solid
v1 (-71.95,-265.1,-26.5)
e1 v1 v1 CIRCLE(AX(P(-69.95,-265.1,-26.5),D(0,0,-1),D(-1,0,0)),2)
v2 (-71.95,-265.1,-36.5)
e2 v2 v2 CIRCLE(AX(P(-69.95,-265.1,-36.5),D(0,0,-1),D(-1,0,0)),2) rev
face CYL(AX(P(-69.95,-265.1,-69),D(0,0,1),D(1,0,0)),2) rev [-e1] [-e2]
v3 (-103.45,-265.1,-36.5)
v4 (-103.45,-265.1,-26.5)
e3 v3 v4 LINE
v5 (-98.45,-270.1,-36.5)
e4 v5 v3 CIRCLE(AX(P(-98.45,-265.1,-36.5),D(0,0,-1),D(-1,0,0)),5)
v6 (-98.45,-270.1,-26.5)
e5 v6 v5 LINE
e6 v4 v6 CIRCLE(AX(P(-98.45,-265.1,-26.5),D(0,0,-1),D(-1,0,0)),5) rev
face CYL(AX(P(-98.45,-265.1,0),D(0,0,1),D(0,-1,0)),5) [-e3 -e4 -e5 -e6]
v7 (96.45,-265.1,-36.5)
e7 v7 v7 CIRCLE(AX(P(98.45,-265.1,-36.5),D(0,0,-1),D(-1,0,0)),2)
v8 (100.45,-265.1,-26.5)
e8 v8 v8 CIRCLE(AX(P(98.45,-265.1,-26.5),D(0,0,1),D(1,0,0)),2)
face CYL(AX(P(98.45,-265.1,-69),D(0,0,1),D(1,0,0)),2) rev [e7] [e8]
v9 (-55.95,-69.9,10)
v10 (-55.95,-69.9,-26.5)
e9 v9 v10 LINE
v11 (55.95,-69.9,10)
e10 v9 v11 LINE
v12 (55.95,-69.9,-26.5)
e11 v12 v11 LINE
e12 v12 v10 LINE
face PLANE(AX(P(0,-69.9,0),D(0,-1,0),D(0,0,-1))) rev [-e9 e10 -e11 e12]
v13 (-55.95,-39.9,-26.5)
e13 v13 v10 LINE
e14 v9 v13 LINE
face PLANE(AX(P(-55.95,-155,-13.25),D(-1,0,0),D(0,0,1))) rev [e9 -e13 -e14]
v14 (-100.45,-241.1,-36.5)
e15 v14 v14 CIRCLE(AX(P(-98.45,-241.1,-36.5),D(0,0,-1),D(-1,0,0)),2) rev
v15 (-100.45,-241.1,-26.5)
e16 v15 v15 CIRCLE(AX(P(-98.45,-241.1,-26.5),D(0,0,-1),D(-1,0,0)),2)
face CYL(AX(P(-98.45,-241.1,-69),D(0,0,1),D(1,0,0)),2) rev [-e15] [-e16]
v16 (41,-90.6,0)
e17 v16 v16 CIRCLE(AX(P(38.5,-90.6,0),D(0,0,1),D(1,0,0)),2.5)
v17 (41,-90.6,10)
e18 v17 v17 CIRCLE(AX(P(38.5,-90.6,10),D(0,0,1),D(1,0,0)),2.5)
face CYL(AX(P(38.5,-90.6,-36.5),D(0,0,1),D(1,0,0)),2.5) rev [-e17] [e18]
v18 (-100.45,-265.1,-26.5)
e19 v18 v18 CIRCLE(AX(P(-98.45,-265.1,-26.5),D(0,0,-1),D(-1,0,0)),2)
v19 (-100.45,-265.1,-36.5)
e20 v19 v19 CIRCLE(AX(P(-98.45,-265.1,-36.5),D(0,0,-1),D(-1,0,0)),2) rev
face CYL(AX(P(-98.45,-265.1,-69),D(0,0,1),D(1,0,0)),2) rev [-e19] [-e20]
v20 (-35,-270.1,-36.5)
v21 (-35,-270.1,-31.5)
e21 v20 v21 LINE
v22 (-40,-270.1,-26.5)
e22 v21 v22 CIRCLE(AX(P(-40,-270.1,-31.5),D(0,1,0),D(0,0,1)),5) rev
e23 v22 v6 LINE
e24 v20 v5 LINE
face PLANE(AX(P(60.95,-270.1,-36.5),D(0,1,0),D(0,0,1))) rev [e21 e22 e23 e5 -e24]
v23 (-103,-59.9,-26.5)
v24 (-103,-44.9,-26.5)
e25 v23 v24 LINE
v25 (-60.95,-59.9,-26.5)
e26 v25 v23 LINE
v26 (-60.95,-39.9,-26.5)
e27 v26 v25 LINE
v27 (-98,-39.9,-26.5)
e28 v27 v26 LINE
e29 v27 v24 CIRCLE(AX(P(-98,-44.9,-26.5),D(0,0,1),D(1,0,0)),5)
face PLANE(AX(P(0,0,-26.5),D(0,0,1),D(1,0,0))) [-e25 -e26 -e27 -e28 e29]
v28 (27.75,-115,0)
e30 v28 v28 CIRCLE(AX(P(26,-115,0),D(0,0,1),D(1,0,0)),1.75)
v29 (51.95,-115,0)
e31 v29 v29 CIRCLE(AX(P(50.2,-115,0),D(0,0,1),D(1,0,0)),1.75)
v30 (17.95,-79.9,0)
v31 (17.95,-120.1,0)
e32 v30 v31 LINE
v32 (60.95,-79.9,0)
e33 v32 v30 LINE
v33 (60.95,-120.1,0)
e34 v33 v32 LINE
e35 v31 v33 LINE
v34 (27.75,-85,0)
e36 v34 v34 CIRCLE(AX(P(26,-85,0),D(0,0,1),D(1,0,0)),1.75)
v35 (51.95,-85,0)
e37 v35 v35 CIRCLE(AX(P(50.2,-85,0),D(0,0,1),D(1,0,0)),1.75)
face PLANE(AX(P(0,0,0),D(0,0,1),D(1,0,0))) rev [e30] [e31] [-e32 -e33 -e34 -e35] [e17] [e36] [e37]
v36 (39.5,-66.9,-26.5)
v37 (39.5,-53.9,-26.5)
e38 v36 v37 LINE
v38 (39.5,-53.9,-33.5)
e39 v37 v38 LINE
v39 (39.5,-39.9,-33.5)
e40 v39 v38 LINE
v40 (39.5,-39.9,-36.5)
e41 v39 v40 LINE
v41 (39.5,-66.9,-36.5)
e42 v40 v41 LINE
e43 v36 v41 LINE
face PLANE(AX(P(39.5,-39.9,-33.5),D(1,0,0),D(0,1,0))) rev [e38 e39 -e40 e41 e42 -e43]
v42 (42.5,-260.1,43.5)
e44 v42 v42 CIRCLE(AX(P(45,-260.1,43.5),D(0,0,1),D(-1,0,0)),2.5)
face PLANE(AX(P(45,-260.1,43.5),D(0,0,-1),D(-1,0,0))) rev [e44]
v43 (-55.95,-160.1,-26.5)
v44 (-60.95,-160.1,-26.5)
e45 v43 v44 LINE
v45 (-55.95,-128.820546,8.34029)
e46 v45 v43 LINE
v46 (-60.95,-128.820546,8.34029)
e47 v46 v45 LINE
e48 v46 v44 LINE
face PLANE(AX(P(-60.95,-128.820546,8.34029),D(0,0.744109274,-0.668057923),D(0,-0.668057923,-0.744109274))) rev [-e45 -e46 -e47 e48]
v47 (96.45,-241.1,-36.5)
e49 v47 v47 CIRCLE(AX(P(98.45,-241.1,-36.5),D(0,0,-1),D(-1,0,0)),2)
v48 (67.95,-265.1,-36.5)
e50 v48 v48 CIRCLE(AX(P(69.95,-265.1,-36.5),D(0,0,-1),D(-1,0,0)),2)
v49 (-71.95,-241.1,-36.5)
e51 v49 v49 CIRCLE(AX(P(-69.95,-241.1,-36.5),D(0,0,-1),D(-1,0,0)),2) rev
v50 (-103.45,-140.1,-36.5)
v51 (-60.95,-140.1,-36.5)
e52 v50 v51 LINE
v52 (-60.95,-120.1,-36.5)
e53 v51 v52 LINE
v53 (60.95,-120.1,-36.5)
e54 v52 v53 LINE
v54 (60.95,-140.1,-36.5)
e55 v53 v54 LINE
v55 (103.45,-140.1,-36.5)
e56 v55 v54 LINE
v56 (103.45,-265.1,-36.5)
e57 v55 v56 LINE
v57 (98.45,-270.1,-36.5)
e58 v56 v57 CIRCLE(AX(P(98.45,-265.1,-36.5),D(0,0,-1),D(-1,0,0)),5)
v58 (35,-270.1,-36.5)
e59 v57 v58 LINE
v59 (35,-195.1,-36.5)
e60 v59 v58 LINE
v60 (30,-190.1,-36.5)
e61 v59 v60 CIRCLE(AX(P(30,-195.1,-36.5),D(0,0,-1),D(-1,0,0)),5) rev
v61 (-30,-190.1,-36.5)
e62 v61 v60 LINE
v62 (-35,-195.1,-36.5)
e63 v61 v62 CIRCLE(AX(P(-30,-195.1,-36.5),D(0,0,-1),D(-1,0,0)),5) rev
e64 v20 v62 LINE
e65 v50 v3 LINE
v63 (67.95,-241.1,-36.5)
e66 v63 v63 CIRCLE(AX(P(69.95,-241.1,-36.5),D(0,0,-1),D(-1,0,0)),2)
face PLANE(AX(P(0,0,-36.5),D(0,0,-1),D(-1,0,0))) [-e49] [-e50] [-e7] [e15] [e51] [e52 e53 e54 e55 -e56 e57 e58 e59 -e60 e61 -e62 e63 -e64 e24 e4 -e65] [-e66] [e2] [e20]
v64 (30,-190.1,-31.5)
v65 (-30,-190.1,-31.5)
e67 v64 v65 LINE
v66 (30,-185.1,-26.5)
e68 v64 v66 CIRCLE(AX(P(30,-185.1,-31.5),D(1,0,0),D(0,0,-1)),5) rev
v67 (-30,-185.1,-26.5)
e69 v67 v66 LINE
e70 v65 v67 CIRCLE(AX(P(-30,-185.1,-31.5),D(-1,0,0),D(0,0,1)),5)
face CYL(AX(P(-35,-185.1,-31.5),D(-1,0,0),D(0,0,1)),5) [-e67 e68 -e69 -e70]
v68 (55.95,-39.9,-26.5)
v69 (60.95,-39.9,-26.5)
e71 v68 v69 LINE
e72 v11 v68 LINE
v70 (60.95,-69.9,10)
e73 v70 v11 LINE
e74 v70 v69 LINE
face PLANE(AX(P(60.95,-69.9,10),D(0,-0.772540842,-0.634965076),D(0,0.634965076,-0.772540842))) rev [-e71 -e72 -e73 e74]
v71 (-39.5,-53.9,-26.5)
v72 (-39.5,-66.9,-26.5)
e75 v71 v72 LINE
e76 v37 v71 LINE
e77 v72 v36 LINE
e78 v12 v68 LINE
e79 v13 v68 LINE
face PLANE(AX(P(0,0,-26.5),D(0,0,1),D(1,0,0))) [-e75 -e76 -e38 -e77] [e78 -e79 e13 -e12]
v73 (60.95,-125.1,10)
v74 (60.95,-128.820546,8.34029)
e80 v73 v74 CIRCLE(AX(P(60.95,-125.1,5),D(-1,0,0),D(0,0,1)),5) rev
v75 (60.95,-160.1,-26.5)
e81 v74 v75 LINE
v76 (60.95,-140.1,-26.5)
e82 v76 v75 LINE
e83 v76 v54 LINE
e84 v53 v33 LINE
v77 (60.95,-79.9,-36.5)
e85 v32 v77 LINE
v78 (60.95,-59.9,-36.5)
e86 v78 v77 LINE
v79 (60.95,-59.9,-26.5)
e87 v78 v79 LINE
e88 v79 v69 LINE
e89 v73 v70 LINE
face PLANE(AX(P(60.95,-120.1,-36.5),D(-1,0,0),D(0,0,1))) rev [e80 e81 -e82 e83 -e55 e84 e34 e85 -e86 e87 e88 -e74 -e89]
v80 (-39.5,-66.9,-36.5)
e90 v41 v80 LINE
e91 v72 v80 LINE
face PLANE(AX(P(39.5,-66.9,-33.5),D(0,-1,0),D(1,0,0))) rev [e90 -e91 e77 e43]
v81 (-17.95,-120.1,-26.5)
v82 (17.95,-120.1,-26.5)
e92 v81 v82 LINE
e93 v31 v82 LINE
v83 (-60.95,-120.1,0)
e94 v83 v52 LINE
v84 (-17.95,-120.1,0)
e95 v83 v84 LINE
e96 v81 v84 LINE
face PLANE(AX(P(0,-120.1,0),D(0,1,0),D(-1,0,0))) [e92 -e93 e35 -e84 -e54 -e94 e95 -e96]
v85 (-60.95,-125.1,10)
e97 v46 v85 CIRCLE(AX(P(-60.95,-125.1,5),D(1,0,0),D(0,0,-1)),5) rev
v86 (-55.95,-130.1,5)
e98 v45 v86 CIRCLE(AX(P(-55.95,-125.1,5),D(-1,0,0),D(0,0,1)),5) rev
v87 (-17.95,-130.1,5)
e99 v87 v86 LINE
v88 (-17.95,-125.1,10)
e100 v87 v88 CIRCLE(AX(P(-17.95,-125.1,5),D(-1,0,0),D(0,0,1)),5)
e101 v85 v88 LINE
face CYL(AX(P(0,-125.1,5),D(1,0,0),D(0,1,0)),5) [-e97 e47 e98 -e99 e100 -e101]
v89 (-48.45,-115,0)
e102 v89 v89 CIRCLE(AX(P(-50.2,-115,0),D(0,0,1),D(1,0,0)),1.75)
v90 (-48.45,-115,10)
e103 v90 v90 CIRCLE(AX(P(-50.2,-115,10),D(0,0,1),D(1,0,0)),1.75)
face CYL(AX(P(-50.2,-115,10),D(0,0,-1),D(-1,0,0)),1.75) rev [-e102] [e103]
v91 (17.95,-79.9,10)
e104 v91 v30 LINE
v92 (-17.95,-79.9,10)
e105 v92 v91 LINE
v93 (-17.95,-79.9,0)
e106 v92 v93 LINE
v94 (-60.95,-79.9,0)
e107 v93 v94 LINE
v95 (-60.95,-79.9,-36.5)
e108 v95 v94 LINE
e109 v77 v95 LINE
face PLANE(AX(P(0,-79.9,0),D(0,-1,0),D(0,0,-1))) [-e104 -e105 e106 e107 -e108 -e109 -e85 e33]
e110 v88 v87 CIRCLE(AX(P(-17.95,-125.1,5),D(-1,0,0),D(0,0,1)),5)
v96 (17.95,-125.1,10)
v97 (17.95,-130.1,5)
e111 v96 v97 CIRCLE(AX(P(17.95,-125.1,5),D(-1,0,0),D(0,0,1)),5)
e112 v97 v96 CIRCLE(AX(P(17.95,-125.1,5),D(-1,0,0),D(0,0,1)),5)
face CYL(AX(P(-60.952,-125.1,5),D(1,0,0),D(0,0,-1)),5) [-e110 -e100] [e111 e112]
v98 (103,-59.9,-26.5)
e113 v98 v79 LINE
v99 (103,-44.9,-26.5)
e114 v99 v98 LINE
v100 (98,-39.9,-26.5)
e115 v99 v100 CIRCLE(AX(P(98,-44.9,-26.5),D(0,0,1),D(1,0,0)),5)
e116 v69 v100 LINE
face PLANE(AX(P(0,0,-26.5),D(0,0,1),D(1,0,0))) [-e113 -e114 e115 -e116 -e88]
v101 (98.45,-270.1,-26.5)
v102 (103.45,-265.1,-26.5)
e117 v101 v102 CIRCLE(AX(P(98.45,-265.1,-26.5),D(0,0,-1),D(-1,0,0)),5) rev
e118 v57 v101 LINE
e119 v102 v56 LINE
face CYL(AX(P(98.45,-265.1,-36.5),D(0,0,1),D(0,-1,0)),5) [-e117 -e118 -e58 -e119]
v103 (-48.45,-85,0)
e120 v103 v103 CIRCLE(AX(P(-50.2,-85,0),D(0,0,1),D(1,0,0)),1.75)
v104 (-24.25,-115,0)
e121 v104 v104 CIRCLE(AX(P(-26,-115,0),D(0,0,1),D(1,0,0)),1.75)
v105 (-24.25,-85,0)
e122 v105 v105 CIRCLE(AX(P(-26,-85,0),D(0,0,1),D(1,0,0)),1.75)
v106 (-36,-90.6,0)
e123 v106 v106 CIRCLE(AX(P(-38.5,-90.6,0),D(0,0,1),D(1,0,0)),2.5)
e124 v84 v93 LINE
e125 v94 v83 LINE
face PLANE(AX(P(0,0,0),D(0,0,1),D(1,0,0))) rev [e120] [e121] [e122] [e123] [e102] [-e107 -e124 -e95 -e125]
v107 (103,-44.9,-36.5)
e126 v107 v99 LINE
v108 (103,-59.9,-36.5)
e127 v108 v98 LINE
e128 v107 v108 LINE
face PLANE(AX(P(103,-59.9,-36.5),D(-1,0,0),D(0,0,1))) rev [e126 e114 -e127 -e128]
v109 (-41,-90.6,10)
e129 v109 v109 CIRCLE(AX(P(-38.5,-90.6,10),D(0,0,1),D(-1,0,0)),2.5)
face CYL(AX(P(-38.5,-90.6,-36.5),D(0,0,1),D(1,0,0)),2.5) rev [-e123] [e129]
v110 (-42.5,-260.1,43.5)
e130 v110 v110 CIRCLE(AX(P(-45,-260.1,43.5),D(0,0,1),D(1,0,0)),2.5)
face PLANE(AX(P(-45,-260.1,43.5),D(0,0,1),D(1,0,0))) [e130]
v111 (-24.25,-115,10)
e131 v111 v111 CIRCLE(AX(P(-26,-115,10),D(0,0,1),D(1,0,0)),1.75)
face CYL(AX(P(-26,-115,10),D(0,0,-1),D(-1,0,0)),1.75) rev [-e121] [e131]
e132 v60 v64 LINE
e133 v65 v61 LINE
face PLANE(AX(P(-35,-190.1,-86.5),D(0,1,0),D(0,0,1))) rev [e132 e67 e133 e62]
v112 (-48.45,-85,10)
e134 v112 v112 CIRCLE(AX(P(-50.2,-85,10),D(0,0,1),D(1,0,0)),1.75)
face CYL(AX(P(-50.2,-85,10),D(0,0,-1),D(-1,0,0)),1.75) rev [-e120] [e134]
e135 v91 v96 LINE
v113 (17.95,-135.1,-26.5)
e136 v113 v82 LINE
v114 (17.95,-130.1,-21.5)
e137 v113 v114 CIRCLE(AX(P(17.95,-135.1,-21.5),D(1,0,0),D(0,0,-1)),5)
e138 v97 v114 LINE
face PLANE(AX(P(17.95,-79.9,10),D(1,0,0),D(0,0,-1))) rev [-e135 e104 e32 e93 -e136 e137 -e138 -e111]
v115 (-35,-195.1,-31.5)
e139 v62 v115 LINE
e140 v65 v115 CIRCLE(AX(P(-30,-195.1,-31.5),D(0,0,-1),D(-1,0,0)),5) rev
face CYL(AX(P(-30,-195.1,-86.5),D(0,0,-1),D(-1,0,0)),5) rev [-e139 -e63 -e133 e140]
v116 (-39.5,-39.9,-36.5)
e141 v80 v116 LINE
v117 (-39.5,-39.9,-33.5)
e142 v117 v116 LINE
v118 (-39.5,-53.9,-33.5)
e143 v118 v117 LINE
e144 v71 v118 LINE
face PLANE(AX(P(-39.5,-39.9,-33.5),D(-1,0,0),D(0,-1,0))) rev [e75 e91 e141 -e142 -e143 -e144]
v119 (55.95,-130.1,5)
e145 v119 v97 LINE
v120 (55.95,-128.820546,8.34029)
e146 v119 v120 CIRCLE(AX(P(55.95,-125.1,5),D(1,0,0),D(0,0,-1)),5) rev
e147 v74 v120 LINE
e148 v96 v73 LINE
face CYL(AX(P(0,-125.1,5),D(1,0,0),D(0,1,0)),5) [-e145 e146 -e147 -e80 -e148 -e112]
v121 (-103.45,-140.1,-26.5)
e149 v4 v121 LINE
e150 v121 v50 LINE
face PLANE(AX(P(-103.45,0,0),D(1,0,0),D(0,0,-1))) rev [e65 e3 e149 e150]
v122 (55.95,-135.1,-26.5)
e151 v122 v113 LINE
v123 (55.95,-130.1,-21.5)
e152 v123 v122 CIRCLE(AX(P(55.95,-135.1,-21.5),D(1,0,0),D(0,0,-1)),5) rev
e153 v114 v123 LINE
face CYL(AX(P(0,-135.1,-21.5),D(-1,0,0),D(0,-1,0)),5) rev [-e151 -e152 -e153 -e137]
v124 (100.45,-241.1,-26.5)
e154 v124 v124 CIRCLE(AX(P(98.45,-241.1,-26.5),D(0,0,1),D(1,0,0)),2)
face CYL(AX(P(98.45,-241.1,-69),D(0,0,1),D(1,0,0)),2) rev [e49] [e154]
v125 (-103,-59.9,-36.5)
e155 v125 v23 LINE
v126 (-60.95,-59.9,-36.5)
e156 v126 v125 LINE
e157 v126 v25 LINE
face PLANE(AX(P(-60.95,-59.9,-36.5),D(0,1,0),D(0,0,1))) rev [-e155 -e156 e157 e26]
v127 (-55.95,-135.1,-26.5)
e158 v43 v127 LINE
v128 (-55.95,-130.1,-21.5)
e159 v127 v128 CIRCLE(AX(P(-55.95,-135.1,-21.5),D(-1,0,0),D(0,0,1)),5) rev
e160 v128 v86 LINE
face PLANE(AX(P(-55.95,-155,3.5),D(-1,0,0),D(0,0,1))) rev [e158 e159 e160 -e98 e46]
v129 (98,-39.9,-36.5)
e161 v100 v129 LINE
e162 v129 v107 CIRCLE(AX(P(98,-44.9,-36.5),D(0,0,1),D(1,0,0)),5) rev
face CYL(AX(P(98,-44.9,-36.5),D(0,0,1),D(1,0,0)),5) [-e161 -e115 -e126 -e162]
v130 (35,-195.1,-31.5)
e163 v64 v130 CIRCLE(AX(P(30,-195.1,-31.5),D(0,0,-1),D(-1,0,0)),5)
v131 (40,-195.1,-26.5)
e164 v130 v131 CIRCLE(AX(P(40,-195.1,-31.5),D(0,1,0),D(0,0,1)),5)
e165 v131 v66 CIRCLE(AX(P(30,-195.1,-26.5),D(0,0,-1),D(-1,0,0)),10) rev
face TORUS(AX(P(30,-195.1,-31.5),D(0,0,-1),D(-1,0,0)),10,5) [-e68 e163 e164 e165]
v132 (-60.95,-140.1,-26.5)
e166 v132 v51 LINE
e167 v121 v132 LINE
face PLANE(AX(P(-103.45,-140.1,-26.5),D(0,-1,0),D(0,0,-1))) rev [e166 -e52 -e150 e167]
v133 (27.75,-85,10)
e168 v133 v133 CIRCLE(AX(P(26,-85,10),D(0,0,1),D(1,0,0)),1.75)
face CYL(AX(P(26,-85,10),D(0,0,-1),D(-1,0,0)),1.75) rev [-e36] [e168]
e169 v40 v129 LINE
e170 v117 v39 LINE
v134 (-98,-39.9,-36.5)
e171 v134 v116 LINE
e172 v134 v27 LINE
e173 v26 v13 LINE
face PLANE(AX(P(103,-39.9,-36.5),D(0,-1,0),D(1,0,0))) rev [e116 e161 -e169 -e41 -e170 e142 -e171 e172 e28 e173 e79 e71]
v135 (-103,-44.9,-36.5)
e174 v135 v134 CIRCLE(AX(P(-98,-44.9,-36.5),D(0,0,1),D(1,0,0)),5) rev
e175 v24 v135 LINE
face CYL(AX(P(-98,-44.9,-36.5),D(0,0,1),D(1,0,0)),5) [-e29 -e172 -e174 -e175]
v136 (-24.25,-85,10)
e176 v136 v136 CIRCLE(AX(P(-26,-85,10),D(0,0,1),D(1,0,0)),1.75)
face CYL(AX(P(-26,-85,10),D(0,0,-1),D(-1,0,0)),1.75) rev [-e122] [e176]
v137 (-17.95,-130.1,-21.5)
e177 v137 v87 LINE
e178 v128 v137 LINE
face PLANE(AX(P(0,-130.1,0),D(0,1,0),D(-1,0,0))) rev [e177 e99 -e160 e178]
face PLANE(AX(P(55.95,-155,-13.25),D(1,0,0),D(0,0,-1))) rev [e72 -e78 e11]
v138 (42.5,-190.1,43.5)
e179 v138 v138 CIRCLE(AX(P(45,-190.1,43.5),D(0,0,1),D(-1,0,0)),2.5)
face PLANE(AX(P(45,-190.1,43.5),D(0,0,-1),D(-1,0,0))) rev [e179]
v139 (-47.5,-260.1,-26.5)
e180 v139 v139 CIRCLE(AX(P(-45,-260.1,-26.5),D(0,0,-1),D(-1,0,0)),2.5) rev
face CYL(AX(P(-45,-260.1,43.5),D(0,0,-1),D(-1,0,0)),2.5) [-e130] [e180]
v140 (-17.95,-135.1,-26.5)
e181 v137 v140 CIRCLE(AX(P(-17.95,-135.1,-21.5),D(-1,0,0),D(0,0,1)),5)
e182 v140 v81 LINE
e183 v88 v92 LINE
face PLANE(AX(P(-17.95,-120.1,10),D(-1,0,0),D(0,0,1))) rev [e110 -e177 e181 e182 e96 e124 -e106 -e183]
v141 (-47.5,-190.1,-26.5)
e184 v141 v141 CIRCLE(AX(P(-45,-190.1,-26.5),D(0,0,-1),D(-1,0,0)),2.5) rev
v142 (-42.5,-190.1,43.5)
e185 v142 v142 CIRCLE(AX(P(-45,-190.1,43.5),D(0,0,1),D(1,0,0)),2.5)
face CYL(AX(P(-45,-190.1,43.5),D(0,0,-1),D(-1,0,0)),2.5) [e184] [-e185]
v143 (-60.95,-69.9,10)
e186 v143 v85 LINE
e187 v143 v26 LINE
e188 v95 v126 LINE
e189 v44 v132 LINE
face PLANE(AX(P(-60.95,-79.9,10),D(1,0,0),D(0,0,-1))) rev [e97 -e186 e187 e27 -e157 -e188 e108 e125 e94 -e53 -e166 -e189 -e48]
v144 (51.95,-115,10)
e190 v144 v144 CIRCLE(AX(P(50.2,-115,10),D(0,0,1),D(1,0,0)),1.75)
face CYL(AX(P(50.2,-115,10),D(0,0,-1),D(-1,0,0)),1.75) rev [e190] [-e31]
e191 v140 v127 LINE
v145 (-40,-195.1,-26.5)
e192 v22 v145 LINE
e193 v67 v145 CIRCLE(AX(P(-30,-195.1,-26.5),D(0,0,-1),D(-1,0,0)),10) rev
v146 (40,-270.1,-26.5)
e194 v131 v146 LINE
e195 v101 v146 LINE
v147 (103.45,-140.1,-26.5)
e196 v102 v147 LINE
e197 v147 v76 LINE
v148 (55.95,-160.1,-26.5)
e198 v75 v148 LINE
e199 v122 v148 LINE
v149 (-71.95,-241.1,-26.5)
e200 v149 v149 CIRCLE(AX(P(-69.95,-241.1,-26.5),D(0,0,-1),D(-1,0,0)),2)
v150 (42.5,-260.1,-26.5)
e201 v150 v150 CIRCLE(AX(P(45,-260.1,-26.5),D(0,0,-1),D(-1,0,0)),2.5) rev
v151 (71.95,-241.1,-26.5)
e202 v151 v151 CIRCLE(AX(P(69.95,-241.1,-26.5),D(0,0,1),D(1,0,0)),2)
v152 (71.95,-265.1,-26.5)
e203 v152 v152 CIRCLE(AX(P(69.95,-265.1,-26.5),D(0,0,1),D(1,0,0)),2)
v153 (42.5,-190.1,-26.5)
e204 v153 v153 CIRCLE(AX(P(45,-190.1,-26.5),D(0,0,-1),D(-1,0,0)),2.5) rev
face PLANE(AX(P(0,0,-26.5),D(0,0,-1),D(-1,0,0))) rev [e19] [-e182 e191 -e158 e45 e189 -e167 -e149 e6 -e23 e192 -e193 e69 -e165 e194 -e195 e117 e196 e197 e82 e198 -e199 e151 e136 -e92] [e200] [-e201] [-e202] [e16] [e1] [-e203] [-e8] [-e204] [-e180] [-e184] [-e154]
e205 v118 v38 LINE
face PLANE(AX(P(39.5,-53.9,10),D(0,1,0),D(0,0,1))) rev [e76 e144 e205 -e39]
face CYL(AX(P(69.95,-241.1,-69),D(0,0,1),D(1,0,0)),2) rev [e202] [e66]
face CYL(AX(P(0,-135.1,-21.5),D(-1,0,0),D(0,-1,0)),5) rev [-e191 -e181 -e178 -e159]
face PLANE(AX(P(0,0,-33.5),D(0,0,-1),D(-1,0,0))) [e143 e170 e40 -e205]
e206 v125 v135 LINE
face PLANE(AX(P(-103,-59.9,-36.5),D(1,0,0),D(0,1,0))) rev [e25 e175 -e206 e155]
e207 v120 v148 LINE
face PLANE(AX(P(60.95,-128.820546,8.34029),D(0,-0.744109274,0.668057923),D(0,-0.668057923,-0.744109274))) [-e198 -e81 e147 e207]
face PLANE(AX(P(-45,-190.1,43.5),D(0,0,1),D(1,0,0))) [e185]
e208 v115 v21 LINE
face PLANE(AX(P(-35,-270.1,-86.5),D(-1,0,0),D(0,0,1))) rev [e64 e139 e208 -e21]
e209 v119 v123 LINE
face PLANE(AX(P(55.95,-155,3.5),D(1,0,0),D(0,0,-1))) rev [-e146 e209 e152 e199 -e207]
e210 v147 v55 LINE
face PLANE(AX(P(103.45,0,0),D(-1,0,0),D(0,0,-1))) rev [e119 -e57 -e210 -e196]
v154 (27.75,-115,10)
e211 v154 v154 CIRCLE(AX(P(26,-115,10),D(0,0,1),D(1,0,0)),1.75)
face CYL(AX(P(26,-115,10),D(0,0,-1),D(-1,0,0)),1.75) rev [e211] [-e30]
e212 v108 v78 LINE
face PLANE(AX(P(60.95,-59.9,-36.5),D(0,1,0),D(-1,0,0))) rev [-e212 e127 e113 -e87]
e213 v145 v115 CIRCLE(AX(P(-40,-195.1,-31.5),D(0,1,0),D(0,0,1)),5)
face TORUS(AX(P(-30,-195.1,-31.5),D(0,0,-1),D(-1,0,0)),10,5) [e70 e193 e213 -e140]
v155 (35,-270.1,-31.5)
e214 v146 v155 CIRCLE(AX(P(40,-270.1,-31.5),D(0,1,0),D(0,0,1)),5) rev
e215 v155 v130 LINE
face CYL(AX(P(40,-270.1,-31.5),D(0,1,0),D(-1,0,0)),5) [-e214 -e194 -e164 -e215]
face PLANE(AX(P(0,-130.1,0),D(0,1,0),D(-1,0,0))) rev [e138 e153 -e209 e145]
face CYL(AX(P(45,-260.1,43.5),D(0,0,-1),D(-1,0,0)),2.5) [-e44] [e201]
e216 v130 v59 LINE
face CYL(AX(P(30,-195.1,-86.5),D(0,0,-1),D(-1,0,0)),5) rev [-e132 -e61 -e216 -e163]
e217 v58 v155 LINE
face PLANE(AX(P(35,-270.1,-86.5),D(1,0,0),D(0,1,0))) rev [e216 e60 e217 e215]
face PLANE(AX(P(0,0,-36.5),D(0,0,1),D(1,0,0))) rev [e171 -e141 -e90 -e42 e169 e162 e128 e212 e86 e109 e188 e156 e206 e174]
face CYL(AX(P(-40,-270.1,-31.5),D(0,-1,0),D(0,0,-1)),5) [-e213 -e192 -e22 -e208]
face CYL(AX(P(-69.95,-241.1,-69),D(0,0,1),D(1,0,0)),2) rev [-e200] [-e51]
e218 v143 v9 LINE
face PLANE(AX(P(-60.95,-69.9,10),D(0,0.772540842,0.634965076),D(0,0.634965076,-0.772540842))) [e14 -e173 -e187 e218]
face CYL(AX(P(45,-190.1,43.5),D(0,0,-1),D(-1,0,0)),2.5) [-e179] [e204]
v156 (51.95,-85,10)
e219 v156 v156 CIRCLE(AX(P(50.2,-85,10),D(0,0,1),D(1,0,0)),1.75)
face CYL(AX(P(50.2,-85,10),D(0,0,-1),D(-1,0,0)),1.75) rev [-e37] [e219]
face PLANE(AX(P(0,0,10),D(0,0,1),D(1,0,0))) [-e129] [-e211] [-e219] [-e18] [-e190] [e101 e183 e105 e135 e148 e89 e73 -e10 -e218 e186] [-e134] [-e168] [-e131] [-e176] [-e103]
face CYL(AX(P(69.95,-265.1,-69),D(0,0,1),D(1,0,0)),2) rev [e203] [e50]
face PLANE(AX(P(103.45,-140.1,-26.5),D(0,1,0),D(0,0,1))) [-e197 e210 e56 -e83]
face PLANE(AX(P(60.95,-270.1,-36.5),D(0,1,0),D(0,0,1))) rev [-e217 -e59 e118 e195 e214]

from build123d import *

# Parameters (mm, degrees)
SKETCH_2_W          = 43
SKETCH_2_H          = 40.2
SKETCH_2_R          = 1.75
EXTRUDE_1_DEPTH     = 10
EXTRUDE_1_2_DEPTH   = 10
SKETCH_3_W          = 43
SKETCH_3_H          = 36.5
EXTRUDE_2_DEPTH     = 10
SKETCH_4_W          = 121.9
SKETCH_4_H          = 150
EXTRUDE_3_DEPTH     = 10
SKETCH_6_W          = 121.9
SKETCH_6_H          = 36.5
EXTRUDE_4_DEPTH     = 10
EXTRUDE_5_REACH     = 285.745
SKETCH_7_R          = 5
FILLET_1_R          = 5
FILLET_2_R          = 5
EXTRUDE_6_DEPTH     = 10
SKETCH_9_W          = 79
SKETCH_9_H          = 27
CUT_EXTRUDE_1_DEPTH = 3
SKETCH_10_W         = 79
SKETCH_10_H         = 13
CUT_EXTRUDE_2_DEPTH = 293.327316548
RIB_16_REACH        = 320.066
SKETCH_11_WALL_W    = 685.378322466
SKETCH_11_WALL_H    = 5
SKETCH_12_W         = 10
SKETCH_12_H         = 130
EXTRUDE_7_DEPTH     = 42.5
SKETCH_13_R         = 2
CUT_EXTRUDE_3_DEPTH = 42.5
SKETCH_14_R         = 2.5
EXTRUDE_8_DEPTH     = 70
SKETCH_15_W         = 70
SKETCH_15_H         = 80
CUT_EXTRUDE_4_DEPTH = 60
RIB_17_REACH        = 321.176
SKETCH_16_WALL_W    = 687.174412562
SKETCH_16_WALL_H    = 5
FILLET_4_R          = 5
FILLET_5_R          = 5
FILLET_6_R          = 5
SKETCH_17_R         = 2.5
CUT_EXTRUDE_5_DEPTH = 293.947371553


with BuildPart() as part:
    # 草图2 → 凸台-拉伸1 (new body)
    with BuildSketch(Plane.XY):
        with Locations((-39.45, -100)):
            Rectangle(SKETCH_2_W, SKETCH_2_H)
        with Locations((-50.2, -85)):
            Circle(SKETCH_2_R, mode=Mode.SUBTRACT)
        with Locations((-26, -85)):
            Circle(SKETCH_2_R, mode=Mode.SUBTRACT)
        with Locations((-50.2, -115)):
            Circle(SKETCH_2_R, mode=Mode.SUBTRACT)
        with Locations((-26, -115)):
            Circle(SKETCH_2_R, mode=Mode.SUBTRACT)
    extrude(amount=EXTRUDE_1_DEPTH)



with BuildPart() as body_2:
    # 草图2 → Extrude 1 2 (new body)
    with BuildSketch(Plane.XY):
        with Locations((39.45, -100)):
            Rectangle(SKETCH_2_W, SKETCH_2_H)
        with Locations((50.2, -85)):
            Circle(SKETCH_2_R, mode=Mode.SUBTRACT)
        with Locations((26, -85)):
            Circle(SKETCH_2_R, mode=Mode.SUBTRACT)
        with Locations((26, -115)):
            Circle(SKETCH_2_R, mode=Mode.SUBTRACT)
        with Locations((50.2, -115)):
            Circle(SKETCH_2_R, mode=Mode.SUBTRACT)
    extrude(amount=EXTRUDE_1_2_DEPTH)


with BuildPart() as part_1:
    add(part.part)

    add(body_2.part)  # 凸台-拉伸2 merges body 2
    # 草图3 → 凸台-拉伸2 (add)
    with BuildSketch(Plane.XZ.offset(120.1)):
        with Locations((39.45, -8.25)):
            Rectangle(SKETCH_3_W, SKETCH_3_H)
        with Locations((-39.45, -8.25)):
            Rectangle(SKETCH_3_W, SKETCH_3_H)
    extrude(amount=EXTRUDE_2_DEPTH)

    # 草图4 → 凸台-拉伸3 (add)
    with BuildSketch(Plane(origin=(0, 0, -26.5), x_dir=(-1, 0, 0), z_dir=(0, 0, -1))):
        with Locations((0, -195.1)):
            Rectangle(SKETCH_4_W, SKETCH_4_H)
    extrude(amount=EXTRUDE_3_DEPTH)

    # 草图6 → 凸台-拉伸4 (add)
    with BuildSketch(Plane(origin=(0, -79.9, 0), x_dir=(1, 0, 0), z_dir=(0, 1, 0))):
        with Locations((0, 8.25)):
            Rectangle(SKETCH_6_W, SKETCH_6_H)
    extrude(amount=EXTRUDE_4_DEPTH)

    # 草图7 → 凸台-拉伸5 (add, up to next)
    with BuildSketch(Plane.ZY.offset(-17.95), mode=Mode.PRIVATE) as extrude_5_sk1:
        with Locations((5, -125.1)):
            Circle(SKETCH_7_R)
    extrude_5_tool1 = extrude(extrude_5_sk1.sketch, amount=EXTRUDE_5_REACH, mode=Mode.PRIVATE) - part_1.part
    add(extrude_5_tool1.solids().sort_by_distance((17.95, -125.1, 5))[0])

    # 圆角1
    fillet_1_edges = [part_1.edges().sort_by_distance(p)[0] for p in [
        (-39.45, -130.1, 10),
        (39.45, -130.1, 10),
    ]]
    fillet(fillet_1_edges, radius=FILLET_1_R)

    # 圆角2
    fillet_2_edges = [part_1.edges().sort_by_distance(p)[0] for p in [
        (-39.45, -130.1, -26.5),
        (39.45, -130.1, -26.5),
    ]]
    fillet(fillet_2_edges, radius=FILLET_2_R)

    # 草图8 → 凸台-拉伸6 (add)
    with BuildSketch(Plane(origin=(0, 0, -26.5), x_dir=(-1, 0, 0), z_dir=(0, 0, -1))):
        Polygon((-60.95, -79.9), (60.95, -79.9), (60.95, -59.9), (103, -59.9), (103, -39.9), (-103, -39.9), (-103, -59.9), (-60.95, -59.9), align=None)
    extrude(amount=EXTRUDE_6_DEPTH)

    # 草图9 → 切除-拉伸1 (cut)
    with BuildSketch(Plane(origin=(0, 0, -36.5), x_dir=(-1, 0, 0), z_dir=(0, 0, -1))):
        with Locations((0, -53.4)):
            Rectangle(SKETCH_9_W, SKETCH_9_H)
    extrude(amount=-CUT_EXTRUDE_1_DEPTH, mode=Mode.SUBTRACT)

    # 草图10 → 切除-拉伸2 (cut, through all)
    with BuildSketch(Plane(origin=(0, 0, -33.5), x_dir=(-1, 0, 0), z_dir=(0, 0, -1))):
        with Locations((0, -60.4)):
            Rectangle(SKETCH_10_W, SKETCH_10_H)
    extrude(amount=-CUT_EXTRUDE_2_DEPTH, mode=Mode.SUBTRACT)

    # 草图11 wall → 筋16 (add, up to next)
    with BuildSketch(Plane(origin=(-60.95, -54.9, -8.25), x_dir=(0, 0.634965075677, -0.772540842073), z_dir=(0, -0.772540842073, -0.634965075677)), mode=Mode.PRIVATE) as rib_16_sk1:
        with Locations((0, 2.5)):
            Rectangle(SKETCH_11_WALL_W, SKETCH_11_WALL_H)
    rib_16_tool1 = extrude(rib_16_sk1.sketch, amount=RIB_16_REACH, mode=Mode.PRIVATE) - part_1.part
    rib_16 = rib_16_tool1.solids().sort_by_distance((-60.95, -54.9, -8.25))[0]
    add(rib_16)

    # 镜向1: 筋16 across plane
    add(rib_16.mirror(Plane(origin=(0, 0, 0), x_dir=(0, 0, 1), z_dir=(1, 0, 0))))

    # 草图12 → 凸台-拉伸7 (add)
    with BuildSketch(Plane.ZY.offset(60.95)):
        with Locations((-31.5, -205.1)):
            Rectangle(SKETCH_12_W, SKETCH_12_H)
    extrude_7 = extrude(amount=EXTRUDE_7_DEPTH)

    # 镜向2: 凸台-拉伸7 across plane
    add(extrude_7.mirror(Plane(origin=(0, 0, 0), x_dir=(0, 0, 1), z_dir=(1, 0, 0))))

    # 草图13 → 切除-拉伸3 (cut)
    with BuildSketch(Plane.XY.offset(-26.5)):
        with Locations((98.45, -265.1)):
            Circle(SKETCH_13_R)
        with Locations((98.45, -241.1)):
            Circle(SKETCH_13_R)
        with Locations((69.95, -265.1)):
            Circle(SKETCH_13_R)
        with Locations((69.95, -241.1)):
            Circle(SKETCH_13_R)
    cut_extrude_3 = extrude(amount=-CUT_EXTRUDE_3_DEPTH, mode=Mode.SUBTRACT)

    # 镜向3: 切除-拉伸3 across plane
    add(cut_extrude_3.mirror(Plane(origin=(0, 0, 0), x_dir=(0, 0, 1), z_dir=(1, 0, 0))), mode=Mode.SUBTRACT)

    # 草图14 → 凸台-拉伸8 (add)
    with BuildSketch(Plane.XY.offset(-26.5)):
        with Locations((-45, -260.1)):
            Circle(SKETCH_14_R)
        with Locations((45, -260.1)):
            Circle(SKETCH_14_R)
        with Locations((-45, -190.1)):
            Circle(SKETCH_14_R)
        with Locations((45, -190.1)):
            Circle(SKETCH_14_R)
    extrude(amount=EXTRUDE_8_DEPTH)

    # 草图15 → 切除-拉伸4 (cut)
    with BuildSketch(Plane.XY.offset(-26.5)):
        with Locations((0, -230.1)):
            Rectangle(SKETCH_15_W, SKETCH_15_H)
    extrude(amount=-CUT_EXTRUDE_4_DEPTH, mode=Mode.SUBTRACT)

    # 草图16 wall → 筋17 (add, up to next)
    with BuildSketch(Plane(origin=(-60.95, -144.460273185, -9.079855192), x_dir=(0, -0.668057923191, -0.744109273737), z_dir=(0, -0.744109273737, 0.668057923191)), mode=Mode.PRIVATE) as rib_17_sk1:
        with Locations((0, 2.5)):
            Rectangle(SKETCH_16_WALL_W, SKETCH_16_WALL_H)
    rib_17_tool1 = extrude(rib_17_sk1.sketch, amount=-RIB_17_REACH, mode=Mode.PRIVATE) - part_1.part
    rib_17 = rib_17_tool1.solids().sort_by_distance((-60.95, -144.460273185, -9.079855192))[0]
    add(rib_17)

    # 镜向4: 筋17 across plane
    add(rib_17.mirror(Plane(origin=(0, 0, 0), x_dir=(0, 0, 1), z_dir=(1, 0, 0))))

    # 圆角4
    fillet_4_edges = [part_1.edges().sort_by_distance(p)[0] for p in [
        (103, -39.9, -31.5),
        (-103, -39.9, -31.5),
    ]]
    fillet(fillet_4_edges, radius=FILLET_4_R)

    # 圆角5
    fillet_5_edges = [part_1.edges().sort_by_distance(p)[0] for p in [
        (103.45, -270.1, -31.5),
        (-103.45, -270.1, -31.5),
    ]]
    fillet(fillet_5_edges, radius=FILLET_5_R)

    # 圆角6
    fillet_6_edges = [part_1.edges().sort_by_distance(p)[0] for p in [
        (-35, -190.1, -31.5),
        (35, -190.1, -31.5),
        (-35, -230.1, -26.5),
        (0, -190.1, -26.5),
        (35, -230.1, -26.5),
    ]]
    fillet(fillet_6_edges, radius=FILLET_6_R)

    # 草图17 → 切除-拉伸5 (cut, through all)
    with BuildSketch(Plane.XY.offset(10)):
        with Locations((38.5, -90.6)):
            Circle(SKETCH_17_R)
        with Locations((-38.5, -90.6)):
            Circle(SKETCH_17_R)
    extrude(amount=-CUT_EXTRUDE_5_DEPTH, mode=Mode.SUBTRACT)


solid = part_1.part
